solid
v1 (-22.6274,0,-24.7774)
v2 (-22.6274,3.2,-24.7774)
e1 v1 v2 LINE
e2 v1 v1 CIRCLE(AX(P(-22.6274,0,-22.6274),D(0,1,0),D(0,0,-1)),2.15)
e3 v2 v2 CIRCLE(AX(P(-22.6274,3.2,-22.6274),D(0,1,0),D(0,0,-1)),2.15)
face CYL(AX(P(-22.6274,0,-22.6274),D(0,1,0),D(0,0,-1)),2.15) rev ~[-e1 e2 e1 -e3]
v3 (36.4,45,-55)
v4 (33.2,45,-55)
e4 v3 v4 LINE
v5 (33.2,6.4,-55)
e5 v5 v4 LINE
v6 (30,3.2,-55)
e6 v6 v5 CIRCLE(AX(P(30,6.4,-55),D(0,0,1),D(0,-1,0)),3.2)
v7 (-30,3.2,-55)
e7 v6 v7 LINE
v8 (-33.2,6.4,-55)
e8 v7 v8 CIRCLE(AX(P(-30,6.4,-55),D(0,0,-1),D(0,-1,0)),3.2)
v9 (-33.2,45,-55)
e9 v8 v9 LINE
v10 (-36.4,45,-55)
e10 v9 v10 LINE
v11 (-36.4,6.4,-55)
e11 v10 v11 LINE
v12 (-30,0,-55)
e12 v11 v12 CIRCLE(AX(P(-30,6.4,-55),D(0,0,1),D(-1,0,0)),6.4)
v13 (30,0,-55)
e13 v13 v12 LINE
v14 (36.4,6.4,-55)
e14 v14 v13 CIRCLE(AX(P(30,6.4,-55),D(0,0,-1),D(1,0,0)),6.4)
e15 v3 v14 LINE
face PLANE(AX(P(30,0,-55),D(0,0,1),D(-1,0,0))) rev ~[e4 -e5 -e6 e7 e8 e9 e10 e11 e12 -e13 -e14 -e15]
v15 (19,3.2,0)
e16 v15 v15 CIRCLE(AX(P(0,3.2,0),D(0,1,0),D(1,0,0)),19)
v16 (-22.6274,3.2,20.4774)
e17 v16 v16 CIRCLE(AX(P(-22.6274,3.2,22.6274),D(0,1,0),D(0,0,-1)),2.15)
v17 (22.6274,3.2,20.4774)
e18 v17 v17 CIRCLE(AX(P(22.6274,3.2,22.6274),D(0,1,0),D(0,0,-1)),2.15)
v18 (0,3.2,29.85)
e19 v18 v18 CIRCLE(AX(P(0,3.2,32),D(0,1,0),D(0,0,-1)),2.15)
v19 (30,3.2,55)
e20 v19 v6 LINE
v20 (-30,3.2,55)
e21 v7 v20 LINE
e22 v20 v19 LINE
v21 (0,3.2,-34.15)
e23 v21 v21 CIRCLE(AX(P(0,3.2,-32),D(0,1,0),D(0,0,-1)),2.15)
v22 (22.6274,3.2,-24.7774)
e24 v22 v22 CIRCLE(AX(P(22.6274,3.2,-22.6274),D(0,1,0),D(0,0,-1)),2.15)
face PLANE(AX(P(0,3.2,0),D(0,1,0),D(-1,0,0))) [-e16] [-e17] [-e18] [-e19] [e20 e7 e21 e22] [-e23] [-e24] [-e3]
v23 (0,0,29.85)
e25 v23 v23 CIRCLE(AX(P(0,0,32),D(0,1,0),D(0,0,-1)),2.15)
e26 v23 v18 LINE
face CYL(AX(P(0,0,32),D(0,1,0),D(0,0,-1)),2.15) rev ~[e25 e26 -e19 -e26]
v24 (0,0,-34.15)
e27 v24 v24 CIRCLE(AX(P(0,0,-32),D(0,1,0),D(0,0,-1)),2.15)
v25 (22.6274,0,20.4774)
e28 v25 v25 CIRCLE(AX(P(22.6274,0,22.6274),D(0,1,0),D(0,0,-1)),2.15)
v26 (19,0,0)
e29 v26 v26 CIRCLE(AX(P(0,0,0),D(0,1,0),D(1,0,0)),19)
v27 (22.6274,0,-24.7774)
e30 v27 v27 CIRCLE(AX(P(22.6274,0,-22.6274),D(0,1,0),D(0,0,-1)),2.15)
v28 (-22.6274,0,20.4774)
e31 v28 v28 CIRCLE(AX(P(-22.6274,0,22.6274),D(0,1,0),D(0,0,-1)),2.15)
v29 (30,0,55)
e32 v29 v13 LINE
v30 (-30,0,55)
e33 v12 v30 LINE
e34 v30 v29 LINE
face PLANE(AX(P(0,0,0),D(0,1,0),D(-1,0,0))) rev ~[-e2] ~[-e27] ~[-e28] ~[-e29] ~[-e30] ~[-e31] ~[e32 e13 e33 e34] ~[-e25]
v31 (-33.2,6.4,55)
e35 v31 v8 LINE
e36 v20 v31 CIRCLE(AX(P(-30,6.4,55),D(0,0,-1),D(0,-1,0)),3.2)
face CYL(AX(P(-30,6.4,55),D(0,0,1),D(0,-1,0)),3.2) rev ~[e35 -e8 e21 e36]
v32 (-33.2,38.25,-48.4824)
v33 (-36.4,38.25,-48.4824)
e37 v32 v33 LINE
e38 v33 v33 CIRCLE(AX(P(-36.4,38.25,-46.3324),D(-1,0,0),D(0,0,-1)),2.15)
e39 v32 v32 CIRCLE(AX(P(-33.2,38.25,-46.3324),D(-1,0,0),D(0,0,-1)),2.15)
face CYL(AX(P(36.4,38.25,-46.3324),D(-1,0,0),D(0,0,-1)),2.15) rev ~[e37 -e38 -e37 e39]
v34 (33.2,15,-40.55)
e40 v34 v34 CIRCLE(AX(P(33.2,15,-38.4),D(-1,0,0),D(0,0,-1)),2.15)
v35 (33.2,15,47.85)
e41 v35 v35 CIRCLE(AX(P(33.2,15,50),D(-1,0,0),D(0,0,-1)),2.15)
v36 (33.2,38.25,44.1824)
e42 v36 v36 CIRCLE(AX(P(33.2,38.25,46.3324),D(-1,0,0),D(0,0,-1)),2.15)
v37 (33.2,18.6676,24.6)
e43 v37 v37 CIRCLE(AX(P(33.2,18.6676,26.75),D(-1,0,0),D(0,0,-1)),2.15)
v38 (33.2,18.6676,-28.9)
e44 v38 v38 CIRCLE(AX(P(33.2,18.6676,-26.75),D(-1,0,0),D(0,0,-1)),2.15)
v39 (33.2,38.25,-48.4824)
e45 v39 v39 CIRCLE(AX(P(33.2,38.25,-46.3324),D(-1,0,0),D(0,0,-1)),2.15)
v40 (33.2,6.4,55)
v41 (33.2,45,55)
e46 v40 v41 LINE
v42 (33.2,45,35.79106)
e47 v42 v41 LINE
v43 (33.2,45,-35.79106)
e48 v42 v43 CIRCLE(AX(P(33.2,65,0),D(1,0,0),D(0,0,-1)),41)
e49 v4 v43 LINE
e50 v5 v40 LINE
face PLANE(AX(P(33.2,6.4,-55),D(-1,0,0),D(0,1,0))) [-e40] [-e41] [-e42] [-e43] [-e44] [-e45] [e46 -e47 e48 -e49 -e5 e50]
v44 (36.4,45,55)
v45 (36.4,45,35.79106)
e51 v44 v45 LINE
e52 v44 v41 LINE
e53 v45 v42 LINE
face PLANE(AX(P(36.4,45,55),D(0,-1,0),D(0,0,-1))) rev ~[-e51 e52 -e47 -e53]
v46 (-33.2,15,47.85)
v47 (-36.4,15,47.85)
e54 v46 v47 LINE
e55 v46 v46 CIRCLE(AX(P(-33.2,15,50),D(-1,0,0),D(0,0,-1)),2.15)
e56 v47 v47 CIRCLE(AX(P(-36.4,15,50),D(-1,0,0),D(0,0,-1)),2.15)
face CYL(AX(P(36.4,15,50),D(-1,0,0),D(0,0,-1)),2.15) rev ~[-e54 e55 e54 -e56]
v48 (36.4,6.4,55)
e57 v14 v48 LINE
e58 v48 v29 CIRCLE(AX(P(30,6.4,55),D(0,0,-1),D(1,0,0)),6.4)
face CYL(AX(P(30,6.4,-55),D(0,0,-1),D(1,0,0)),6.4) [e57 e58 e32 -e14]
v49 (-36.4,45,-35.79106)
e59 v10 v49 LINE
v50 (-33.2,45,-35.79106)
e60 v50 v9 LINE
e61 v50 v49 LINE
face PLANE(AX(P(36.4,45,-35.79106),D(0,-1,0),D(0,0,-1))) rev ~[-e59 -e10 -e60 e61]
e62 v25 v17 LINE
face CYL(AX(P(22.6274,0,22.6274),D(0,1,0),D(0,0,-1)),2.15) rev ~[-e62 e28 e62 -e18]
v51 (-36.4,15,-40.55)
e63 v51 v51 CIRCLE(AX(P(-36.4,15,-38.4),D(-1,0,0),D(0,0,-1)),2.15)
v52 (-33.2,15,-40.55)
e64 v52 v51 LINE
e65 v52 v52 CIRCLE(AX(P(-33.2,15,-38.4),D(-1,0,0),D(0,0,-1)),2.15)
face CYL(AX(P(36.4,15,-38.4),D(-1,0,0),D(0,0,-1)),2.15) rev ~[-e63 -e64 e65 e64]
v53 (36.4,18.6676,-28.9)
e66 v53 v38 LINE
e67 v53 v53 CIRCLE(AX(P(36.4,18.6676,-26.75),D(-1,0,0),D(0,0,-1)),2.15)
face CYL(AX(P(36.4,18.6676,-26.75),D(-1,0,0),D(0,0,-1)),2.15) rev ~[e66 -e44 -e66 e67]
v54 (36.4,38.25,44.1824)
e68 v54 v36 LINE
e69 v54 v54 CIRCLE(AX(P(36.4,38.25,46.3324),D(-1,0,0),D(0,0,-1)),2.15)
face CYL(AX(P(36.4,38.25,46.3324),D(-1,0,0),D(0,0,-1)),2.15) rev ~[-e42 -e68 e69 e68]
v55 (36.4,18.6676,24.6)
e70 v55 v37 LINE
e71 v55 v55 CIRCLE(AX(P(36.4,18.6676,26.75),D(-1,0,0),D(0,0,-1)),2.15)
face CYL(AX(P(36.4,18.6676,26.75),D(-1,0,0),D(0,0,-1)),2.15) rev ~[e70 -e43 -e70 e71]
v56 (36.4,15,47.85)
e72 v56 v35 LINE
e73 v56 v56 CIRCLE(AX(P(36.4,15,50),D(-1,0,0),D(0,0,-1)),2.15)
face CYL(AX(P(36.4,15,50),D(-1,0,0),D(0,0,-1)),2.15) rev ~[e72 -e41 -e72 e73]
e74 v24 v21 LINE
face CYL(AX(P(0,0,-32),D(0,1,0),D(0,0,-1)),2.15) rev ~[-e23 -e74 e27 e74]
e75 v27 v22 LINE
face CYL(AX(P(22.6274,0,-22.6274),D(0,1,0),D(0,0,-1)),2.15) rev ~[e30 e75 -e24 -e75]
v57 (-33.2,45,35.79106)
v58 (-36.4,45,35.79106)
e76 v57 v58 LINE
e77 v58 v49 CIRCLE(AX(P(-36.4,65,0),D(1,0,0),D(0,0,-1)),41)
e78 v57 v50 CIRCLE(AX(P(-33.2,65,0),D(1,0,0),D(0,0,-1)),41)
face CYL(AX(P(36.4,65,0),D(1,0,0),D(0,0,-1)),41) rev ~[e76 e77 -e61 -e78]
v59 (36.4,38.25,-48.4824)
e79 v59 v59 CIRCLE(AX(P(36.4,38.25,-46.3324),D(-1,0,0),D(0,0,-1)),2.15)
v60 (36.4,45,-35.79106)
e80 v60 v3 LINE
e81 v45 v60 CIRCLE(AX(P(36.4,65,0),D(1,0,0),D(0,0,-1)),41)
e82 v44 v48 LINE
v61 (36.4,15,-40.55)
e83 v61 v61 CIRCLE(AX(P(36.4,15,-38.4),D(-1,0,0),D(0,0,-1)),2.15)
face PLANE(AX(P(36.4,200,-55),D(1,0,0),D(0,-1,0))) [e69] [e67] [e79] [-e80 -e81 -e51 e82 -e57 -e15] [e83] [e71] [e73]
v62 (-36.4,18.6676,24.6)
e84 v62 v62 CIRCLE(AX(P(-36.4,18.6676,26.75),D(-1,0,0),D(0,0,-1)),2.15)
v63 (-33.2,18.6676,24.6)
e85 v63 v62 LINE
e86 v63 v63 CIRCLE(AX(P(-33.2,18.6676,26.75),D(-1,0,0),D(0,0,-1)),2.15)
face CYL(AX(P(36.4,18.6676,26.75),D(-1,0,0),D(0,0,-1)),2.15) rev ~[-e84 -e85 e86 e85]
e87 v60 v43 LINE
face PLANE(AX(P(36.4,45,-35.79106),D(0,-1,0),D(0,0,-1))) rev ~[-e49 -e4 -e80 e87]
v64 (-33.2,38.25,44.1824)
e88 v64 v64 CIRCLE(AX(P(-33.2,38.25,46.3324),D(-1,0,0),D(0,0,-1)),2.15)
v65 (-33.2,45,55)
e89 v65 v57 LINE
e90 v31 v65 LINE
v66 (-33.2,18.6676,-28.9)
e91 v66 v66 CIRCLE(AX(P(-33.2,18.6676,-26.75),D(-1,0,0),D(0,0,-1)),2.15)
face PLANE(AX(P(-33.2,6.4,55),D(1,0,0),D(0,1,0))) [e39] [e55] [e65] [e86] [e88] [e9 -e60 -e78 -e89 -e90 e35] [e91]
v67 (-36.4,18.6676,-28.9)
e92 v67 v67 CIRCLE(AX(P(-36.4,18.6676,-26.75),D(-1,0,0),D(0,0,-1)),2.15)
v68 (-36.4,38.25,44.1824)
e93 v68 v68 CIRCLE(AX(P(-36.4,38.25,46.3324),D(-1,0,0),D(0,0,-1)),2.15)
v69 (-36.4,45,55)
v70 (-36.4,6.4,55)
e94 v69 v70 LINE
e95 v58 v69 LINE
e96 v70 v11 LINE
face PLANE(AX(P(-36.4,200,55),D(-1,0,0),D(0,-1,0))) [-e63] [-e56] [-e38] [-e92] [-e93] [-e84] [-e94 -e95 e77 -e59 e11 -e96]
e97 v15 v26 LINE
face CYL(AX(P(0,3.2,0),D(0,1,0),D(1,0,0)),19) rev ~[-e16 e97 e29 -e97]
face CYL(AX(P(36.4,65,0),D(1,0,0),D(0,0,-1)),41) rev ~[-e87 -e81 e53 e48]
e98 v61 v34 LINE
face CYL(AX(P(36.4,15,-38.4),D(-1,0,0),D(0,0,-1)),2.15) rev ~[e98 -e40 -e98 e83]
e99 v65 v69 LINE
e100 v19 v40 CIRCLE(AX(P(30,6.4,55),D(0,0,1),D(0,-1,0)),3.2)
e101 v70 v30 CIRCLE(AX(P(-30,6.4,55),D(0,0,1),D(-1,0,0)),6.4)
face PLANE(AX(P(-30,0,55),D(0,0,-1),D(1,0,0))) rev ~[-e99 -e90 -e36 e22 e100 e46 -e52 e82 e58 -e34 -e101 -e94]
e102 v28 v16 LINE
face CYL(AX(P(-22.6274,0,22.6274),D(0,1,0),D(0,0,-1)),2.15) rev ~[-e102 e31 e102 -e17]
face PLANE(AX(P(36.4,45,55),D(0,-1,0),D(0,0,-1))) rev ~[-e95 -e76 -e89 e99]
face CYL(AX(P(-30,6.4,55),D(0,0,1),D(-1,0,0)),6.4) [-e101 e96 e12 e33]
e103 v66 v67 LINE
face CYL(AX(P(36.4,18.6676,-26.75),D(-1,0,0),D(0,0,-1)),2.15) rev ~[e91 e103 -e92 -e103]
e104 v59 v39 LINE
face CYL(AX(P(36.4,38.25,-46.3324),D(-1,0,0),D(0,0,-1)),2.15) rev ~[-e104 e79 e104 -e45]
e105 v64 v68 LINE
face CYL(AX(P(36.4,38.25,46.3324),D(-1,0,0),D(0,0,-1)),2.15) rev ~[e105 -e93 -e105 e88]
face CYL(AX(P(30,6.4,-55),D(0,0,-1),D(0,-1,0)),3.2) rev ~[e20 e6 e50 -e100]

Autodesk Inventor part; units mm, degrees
ref_plane "YZ Plane" through (0, 0, 0) normal (1, 0, 0) x (0, 1, 0)
ref_plane "XZ Plane" through (0, 0, 0) normal (0, 1, 0) x (-1, 0, 0)
ref_plane "XY Plane" through (0, 0, 0) normal (0, 0, 1) x (1, 0, 0)
sketch "スケッチ1" plane through (0, 0, 0) normal (0, 1, 0) x (-1, 0, 0)
  line L0 (30, 55) -> (-30, 55)
  line L1 (-30, 55) -> (-30, -55)
  line L2 (-30, -55) -> (30, -55)
  line L3 (30, -55) -> (30, 55)
  line L4 (30, 55) -> (-30, -55) construction
  line L5 (-30, 55) -> (30, -55) construction
  point P0 (0, 0)
  dimension "d0" = 60
  dimension "d1" = 110
extrude "プレート1" add sketch "スケッチ1" along normal blind 3.2
sketch "スケッチ2" plane through (-33.2, 6.4, 55) normal (-1, 0, 0) x (0, -1, 0)
  line L0 (0, -110) -> (0, 0)
  line L1 (0, 0) -> (-193.6, 0)
  line L2 (-193.6, 0) -> (-193.6, -110)
  line L3 (-193.6, -110) -> (0, -110)
edge flange "フランジ1" height 200 angle 90 thickness 3.2 bend radius 3.2 thickness toward (-1, 0, 0) relief tear relief width 3.2 relief depth 1.6 corner gap 3.2 corner form 0 edges at (-30, 3.2, 0) (30, 3.2, 0) wall of the first edge with corners at (-33.2, 6.4, -55) (-33.2, 6.4, 55) (-33.2, 200, 55) (-33.2, 200, -55)
bend "曲げ1"
corner "コーナー1"
sketch "スケッチ3" plane through (36.4, 200, 55) normal (1, 0, 0) x (0, 0, -1)
  circle A0 centre (55, -135) radius 41
  line L0 (0, -200) -> (110, -200) projected
  line L1 (0, -193.6) -> (0, 0) projected
  line L2 (110, 0) -> (110, -193.6) projected
  line L3 (0, 0) -> (0, -193.6) projected
  line L4 (110, 0) -> (0, 0) projected
  line L5 (0, -155) -> (110, -155)
  line L6 (110, -155) -> (110, 0)
  line L7 (110, 0) -> (0, 0)
  line L8 (0, 0) -> (0, -155)
  point P0 (55, -200)
  point P1 (90.7911, -155)
  point P2 (110, -155)
  point P3 (0, -155)
  point P4 (19.2089, -155)
  dimension "d13" = 82
  dimension "d14" = 65
  dimension "d17" = 45
extrude "押し出し1" cut sketch "スケッチ3" against normal through all
sketch "スケッチ4" plane through (36.4, 6.4, 55) normal (1, 0, 0) x (0, 0, -1)
  arc A0 (19.2089, 38.6) -> (90.7911, 38.6) centre (55, 58.6) ccw projected
  circle A1 centre (55, 58.6) radius 53.5
  point P0 (55, -6.4)
  point P1 (55, 112.1)
  point P2 (28.25, 104.9324)
  point P3 (8.6676, 85.35)
  point P4 (1.5, 58.6)
  point P5 (8.6676, 31.85)
  point P6 (28.25, 12.2676)
  point P7 (55, 5.1)
  point P8 (81.75, 12.2676)
  point P9 (101.3324, 31.85)
  point P10 (108.5, 58.6)
  point P11 (101.3324, 85.35)
  point P12 (81.75, 104.9324)
  dimension "d18" = 107
  dimension "d21" = 360
hole "穴1" at (36.4, 18.6676, 26.75) at (36.4, 38.25, 46.3324) at (36.4, 38.25, -46.3324) at (36.4, 18.6676, -26.75) direction (-1, 0, 0) diameter 4.3 end through all clearance for "Socket Head Cap Screw" size "M4" standard "Ansi Metric M Profile"
sketch "スケッチ5" plane through (36.4, 6.4, 55) normal (1, 0, 0) x (0, 0, -1)
  line L0 (0, 0) -> (0, 38.6) projected
  arc A0 (19.2089, 38.6) -> (90.7911, 38.6) centre (55, 58.6) ccw projected
  line L1 (0, 0) -> (110, 0) projected
  point P0 (55, -6.4)
  point P1 (5, 8.6)
  point P2 (93.4, 8.6)
  dimension "d30" = 88.4
  dimension "d31" = 5
  dimension "d34" = 50
hole "穴2" at (36.4, 15, 50) at (36.4, 15, -38.4) direction (-1, 0, 0) diameter 4.3 end through all clearance for "Socket Head Cap Screw" size "M4" standard "Ansi Metric M Profile"
sketch "スケッチ6" plane through (0, 0, 0) normal (0, -1, 0) x (1, 0, 0)
  circle A0 centre (0, 0) radius 32
  point P0 (0, 32)
  point P1 (-22.6274, 22.6274)
  point P2 (-32, 0)
  point P3 (-22.6274, -22.6274)
  point P4 (0, -32)
  point P5 (22.6274, -22.6274)
  point P6 (32, 0)
  point P7 (22.6274, 22.6274)
  dimension "d42" = 64
  dimension "d45" = 360
hole "穴3" at (22.6274, 0, 22.6274) at (-22.6274, 0, 22.6274) at (0, 0, 32) at (22.6274, 0, -22.6274) at (0, 0, -32) at (-22.6274, 0, -22.6274) direction (0, 1, 0) diameter 4.3 end through all clearance for "Socket Head Cap Screw" size "M4" standard "Ansi Metric M Profile"
sketch "スケッチ7" plane through (0, 3.2, 0) normal (0, 1, 0) x (1, 0, 0)
  circle A0 centre (0, 0) radius 19
  dimension "d54" = 38
extrude "押し出し2" cut sketch "スケッチ7" against normal blind 10
equation "\"d28\" = Thickness"
equation "\"d2\" = Thickness"
equation "\"d3\" = BendReliefWidth"
equation "\"d4\" = BendReliefDepth"
equation "\"d5\" = MinimumRemnant"
equation "\"d6\" = TransitionRadius"
equation "\"d9\" = BendRadius"
equation "\"d10\" = CornerReliefSize"
equation "\"d11\" = GapSize"
equation "\"d12\" = JacobiRadiusSize"
equation "\"BendRadius\" = Thickness"
equation "\"BendReliefWidth\" = Thickness"
equation "\"BendReliefDepth\" = 0.5 * Thickness"
equation "\"CornerReliefSize\" = 4 * Thickness"
equation "\"MinimumRemnant\" = 2 * Thickness"
equation "\"TransitionRadius\" = BendRadius"
equation "\"JacobiRadiusSize\" = BendRadius"
equation "\"GapSize\" = Thickness"
equation "\"Thickness\" = 3.2"
properties part number "steelplate2" material "鋼、炭素鋼"
